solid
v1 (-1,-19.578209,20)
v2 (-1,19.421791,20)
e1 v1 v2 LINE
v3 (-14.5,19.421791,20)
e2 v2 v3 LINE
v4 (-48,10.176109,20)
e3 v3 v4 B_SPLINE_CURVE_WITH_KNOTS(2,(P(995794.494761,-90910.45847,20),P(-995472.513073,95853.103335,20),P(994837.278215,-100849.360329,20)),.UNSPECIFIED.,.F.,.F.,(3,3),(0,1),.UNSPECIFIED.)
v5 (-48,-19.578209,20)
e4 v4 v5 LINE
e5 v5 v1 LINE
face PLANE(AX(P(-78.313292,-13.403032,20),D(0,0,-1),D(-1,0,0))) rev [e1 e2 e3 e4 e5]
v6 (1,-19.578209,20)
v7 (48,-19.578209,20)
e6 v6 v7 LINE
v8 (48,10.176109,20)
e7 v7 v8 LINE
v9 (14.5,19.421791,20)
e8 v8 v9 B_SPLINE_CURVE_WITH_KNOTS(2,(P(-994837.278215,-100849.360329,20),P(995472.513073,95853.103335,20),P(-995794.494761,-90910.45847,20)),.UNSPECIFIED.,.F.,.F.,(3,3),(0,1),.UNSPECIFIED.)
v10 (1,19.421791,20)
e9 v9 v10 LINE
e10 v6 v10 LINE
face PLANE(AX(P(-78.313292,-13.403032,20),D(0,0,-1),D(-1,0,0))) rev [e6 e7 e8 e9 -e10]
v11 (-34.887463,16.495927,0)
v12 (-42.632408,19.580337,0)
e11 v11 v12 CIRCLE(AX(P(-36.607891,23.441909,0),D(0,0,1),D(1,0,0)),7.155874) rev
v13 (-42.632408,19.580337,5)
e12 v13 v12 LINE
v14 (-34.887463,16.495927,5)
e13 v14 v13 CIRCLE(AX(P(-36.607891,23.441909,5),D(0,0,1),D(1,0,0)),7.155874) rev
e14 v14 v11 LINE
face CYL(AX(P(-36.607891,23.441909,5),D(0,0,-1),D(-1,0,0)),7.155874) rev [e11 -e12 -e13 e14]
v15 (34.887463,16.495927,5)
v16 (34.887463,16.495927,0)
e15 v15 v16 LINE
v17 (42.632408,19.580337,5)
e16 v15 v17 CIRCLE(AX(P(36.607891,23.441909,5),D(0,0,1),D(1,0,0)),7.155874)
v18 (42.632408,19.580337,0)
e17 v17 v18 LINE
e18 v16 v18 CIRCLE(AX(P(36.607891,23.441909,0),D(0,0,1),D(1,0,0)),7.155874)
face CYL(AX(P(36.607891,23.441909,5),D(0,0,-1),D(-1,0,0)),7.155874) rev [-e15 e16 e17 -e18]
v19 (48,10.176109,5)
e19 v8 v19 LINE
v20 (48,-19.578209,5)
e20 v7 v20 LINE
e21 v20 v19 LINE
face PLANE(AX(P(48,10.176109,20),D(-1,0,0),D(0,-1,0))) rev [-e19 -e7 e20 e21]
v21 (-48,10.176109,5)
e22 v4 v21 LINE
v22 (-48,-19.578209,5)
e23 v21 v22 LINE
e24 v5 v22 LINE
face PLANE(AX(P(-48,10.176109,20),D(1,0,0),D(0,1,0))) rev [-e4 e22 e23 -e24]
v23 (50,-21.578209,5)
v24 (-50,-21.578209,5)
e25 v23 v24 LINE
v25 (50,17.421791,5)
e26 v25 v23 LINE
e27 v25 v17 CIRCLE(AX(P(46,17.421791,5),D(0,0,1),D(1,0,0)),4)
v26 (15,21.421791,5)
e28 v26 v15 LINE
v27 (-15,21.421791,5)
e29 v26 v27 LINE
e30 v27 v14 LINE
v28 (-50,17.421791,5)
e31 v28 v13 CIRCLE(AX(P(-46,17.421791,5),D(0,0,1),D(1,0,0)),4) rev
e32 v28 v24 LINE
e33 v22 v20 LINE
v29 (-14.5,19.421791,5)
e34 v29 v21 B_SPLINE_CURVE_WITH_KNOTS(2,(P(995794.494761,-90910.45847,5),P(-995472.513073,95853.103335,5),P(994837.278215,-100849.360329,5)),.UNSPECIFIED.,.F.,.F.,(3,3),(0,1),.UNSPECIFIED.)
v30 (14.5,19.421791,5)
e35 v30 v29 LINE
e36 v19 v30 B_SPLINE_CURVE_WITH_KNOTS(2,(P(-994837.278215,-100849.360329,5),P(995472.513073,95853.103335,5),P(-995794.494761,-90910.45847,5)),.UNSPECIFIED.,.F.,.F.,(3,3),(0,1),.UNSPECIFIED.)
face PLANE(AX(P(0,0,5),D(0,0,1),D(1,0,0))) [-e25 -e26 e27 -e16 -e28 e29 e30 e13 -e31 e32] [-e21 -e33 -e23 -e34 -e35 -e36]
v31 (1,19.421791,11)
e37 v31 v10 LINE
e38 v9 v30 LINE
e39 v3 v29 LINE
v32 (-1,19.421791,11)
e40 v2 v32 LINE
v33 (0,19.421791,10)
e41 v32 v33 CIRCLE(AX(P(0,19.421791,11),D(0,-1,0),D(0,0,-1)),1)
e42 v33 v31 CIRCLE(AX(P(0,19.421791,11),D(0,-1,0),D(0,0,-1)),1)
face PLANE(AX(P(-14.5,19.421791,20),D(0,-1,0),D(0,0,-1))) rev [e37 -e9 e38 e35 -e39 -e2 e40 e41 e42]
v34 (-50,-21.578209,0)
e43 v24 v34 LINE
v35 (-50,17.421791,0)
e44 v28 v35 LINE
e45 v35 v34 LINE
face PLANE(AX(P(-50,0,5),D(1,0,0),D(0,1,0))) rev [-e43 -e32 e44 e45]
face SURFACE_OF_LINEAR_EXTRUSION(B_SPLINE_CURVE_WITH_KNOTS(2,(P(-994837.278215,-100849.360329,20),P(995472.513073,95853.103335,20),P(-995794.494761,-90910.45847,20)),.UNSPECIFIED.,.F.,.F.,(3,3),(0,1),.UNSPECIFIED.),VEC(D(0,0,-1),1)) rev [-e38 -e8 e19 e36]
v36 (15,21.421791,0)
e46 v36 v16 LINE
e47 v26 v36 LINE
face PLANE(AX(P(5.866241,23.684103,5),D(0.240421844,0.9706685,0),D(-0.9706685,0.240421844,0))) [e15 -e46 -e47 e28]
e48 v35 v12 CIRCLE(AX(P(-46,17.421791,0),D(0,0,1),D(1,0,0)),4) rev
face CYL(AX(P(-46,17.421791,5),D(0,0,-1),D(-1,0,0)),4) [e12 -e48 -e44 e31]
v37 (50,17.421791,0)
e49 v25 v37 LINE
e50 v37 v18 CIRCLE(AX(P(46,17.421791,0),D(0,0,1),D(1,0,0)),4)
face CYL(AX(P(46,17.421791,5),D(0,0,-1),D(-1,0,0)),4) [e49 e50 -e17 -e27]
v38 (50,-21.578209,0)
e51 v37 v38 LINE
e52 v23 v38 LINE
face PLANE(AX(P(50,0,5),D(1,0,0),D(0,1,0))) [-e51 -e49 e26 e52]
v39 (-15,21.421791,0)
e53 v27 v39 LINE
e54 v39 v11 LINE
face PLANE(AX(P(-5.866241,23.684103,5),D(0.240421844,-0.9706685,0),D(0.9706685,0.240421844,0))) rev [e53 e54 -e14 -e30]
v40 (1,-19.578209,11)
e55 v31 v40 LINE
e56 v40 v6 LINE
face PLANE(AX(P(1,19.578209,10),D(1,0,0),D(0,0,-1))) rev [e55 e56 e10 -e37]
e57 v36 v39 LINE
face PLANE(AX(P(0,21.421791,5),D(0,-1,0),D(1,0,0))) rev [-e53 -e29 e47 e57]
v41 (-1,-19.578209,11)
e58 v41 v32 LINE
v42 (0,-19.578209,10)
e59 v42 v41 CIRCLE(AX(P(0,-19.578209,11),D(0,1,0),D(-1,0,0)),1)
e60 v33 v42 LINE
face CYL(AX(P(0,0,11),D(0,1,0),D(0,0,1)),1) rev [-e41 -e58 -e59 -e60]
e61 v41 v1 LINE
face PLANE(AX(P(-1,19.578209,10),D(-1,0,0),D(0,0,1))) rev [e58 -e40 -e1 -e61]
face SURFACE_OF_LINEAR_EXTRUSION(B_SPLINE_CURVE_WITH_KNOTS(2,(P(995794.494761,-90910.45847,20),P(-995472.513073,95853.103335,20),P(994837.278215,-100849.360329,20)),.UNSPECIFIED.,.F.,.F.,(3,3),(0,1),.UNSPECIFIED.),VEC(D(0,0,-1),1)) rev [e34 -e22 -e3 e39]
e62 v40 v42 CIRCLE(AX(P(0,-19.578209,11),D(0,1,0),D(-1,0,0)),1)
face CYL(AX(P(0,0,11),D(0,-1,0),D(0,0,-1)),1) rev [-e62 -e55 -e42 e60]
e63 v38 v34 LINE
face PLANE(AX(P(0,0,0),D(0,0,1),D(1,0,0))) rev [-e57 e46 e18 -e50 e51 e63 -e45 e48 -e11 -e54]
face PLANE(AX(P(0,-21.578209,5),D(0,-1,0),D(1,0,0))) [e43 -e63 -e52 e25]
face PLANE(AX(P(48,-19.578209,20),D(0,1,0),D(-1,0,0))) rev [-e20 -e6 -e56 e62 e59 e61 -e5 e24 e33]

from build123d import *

# Parameters (mm, degrees)
BOSS_EXTRUDE5_DEPTH = 15
BOSS_EXTRUDE6_DEPTH = 5
SKETCH3_W           = 2
SKETCH3_H           = 39.156418696
CUT_EXTRUDE1_DEPTH  = 10
FILLET2_R           = 1


with BuildPart() as part:
    # Sketch2 → Boss-Extrude5 (new body)
    with BuildSketch(Plane.XY.offset(5)):
        with BuildLine():
            Line((-14.5, 19.421790652), (14.5, 19.421790652))
            add(Edge.make_bspline(
                [(14.5, 19.421790652), (34.327554894, 15.095349213), (48, 10.176108588)],
                knots=[0, 0, 0, 1, 1, 1], degree=2))
            Line((48, 10.176108588), (48, -19.578209348))
            Line((48, -19.578209348), (-48, -19.578209348))
            Line((-48, -19.578209348), (-48, 10.176108588))
            add(Edge.make_bspline(
                [(-14.5, 19.421790652), (-34.327554894, 15.095349213), (-48, 10.176108588)],
                knots=[0, 0, 0, 1, 1, 1], degree=2))
        make_face()
    extrude(amount=BOSS_EXTRUDE5_DEPTH)

    # Sketch1 → Boss-Extrude6 (add)
    # profile 1 of 2: a face of its own
    with BuildSketch(Plane.XY):
        with BuildLine():
            Line((-15, 21.421790652), (-34.887462632, 16.495927254))
            ThreePointArc((-34.887462632, 16.495927254), (-39.255473059, 16.793838072), (-42.632407856, 19.580337189))
            ThreePointArc((-42.632407856, 19.580337189), (-47.124640259, 21.2604342), (-50, 17.421790652))
            Line((-50, 17.421790652), (-50, -21.578209348))
            Line((-50, -21.578209348), (50, -21.578209348))
            Line((50, -21.578209348), (50, 17.421790652))
            ThreePointArc((50, 17.421790652), (47.124640259, 21.2604342), (42.632407856, 19.580337189))
            ThreePointArc((42.632407856, 19.580337189), (39.255473059, 16.793838072), (34.887462632, 16.495927254))
            Line((34.887462632, 16.495927254), (15, 21.421790652))
            Line((15, 21.421790652), (-15, 21.421790652))
        make_face()
        with BuildLine():
            add(Edge.make_bspline(
                [(-14.5, 19.421790652), (-34.327554894, 15.095349213), (-48, 10.176108588)],
                knots=[0, 0, 0, 1, 1, 1], degree=2))
            Line((-48, 10.176108588), (-48, -19.578209348))
            Line((-48, -19.578209348), (48, -19.578209348))
            Line((48, -19.578209348), (48, 10.176108588))
            add(Edge.make_bspline(
                [(14.5, 19.421790652), (34.327554894, 15.095349213), (48, 10.176108588)],
                knots=[0, 0, 0, 1, 1, 1], degree=2))
            Line((14.5, 19.421790652), (-14.5, 19.421790652))
        make_face(mode=Mode.SUBTRACT)
    # profile 2 of 2: a face of its own
    with BuildSketch(Plane.XY):
        with BuildLine():
            Line((-14.5, 19.421790652), (14.5, 19.421790652))
            add(Edge.make_bspline(
                [(14.5, 19.421790652), (34.327554894, 15.095349213), (48, 10.176108588)],
                knots=[0, 0, 0, 1, 1, 1], degree=2))
            Line((48, 10.176108588), (48, -19.578209348))
            Line((48, -19.578209348), (-48, -19.578209348))
            Line((-48, -19.578209348), (-48, 10.176108588))
            add(Edge.make_bspline(
                [(-14.5, 19.421790652), (-34.327554894, 15.095349213), (-48, 10.176108588)],
                knots=[0, 0, 0, 1, 1, 1], degree=2))
        make_face()
    extrude(amount=BOSS_EXTRUDE6_DEPTH)

    # Sketch3 → Cut-Extrude1 (cut)
    with BuildSketch(Plane.XY.offset(20)):
        Rectangle(SKETCH3_W, SKETCH3_H)
    extrude(amount=-CUT_EXTRUDE1_DEPTH, mode=Mode.SUBTRACT)

    # Fillet2
    fillet2_edges = [part.edges().sort_by_distance(p)[0] for p in [
        (1, -0.078209348, 10),
        (-1, -0.078209348, 10),
    ]]
    fillet(fillet2_edges, radius=FILLET2_R - 0.0001)  # a hair under: the kernel refuses the full size


solid = part.part
